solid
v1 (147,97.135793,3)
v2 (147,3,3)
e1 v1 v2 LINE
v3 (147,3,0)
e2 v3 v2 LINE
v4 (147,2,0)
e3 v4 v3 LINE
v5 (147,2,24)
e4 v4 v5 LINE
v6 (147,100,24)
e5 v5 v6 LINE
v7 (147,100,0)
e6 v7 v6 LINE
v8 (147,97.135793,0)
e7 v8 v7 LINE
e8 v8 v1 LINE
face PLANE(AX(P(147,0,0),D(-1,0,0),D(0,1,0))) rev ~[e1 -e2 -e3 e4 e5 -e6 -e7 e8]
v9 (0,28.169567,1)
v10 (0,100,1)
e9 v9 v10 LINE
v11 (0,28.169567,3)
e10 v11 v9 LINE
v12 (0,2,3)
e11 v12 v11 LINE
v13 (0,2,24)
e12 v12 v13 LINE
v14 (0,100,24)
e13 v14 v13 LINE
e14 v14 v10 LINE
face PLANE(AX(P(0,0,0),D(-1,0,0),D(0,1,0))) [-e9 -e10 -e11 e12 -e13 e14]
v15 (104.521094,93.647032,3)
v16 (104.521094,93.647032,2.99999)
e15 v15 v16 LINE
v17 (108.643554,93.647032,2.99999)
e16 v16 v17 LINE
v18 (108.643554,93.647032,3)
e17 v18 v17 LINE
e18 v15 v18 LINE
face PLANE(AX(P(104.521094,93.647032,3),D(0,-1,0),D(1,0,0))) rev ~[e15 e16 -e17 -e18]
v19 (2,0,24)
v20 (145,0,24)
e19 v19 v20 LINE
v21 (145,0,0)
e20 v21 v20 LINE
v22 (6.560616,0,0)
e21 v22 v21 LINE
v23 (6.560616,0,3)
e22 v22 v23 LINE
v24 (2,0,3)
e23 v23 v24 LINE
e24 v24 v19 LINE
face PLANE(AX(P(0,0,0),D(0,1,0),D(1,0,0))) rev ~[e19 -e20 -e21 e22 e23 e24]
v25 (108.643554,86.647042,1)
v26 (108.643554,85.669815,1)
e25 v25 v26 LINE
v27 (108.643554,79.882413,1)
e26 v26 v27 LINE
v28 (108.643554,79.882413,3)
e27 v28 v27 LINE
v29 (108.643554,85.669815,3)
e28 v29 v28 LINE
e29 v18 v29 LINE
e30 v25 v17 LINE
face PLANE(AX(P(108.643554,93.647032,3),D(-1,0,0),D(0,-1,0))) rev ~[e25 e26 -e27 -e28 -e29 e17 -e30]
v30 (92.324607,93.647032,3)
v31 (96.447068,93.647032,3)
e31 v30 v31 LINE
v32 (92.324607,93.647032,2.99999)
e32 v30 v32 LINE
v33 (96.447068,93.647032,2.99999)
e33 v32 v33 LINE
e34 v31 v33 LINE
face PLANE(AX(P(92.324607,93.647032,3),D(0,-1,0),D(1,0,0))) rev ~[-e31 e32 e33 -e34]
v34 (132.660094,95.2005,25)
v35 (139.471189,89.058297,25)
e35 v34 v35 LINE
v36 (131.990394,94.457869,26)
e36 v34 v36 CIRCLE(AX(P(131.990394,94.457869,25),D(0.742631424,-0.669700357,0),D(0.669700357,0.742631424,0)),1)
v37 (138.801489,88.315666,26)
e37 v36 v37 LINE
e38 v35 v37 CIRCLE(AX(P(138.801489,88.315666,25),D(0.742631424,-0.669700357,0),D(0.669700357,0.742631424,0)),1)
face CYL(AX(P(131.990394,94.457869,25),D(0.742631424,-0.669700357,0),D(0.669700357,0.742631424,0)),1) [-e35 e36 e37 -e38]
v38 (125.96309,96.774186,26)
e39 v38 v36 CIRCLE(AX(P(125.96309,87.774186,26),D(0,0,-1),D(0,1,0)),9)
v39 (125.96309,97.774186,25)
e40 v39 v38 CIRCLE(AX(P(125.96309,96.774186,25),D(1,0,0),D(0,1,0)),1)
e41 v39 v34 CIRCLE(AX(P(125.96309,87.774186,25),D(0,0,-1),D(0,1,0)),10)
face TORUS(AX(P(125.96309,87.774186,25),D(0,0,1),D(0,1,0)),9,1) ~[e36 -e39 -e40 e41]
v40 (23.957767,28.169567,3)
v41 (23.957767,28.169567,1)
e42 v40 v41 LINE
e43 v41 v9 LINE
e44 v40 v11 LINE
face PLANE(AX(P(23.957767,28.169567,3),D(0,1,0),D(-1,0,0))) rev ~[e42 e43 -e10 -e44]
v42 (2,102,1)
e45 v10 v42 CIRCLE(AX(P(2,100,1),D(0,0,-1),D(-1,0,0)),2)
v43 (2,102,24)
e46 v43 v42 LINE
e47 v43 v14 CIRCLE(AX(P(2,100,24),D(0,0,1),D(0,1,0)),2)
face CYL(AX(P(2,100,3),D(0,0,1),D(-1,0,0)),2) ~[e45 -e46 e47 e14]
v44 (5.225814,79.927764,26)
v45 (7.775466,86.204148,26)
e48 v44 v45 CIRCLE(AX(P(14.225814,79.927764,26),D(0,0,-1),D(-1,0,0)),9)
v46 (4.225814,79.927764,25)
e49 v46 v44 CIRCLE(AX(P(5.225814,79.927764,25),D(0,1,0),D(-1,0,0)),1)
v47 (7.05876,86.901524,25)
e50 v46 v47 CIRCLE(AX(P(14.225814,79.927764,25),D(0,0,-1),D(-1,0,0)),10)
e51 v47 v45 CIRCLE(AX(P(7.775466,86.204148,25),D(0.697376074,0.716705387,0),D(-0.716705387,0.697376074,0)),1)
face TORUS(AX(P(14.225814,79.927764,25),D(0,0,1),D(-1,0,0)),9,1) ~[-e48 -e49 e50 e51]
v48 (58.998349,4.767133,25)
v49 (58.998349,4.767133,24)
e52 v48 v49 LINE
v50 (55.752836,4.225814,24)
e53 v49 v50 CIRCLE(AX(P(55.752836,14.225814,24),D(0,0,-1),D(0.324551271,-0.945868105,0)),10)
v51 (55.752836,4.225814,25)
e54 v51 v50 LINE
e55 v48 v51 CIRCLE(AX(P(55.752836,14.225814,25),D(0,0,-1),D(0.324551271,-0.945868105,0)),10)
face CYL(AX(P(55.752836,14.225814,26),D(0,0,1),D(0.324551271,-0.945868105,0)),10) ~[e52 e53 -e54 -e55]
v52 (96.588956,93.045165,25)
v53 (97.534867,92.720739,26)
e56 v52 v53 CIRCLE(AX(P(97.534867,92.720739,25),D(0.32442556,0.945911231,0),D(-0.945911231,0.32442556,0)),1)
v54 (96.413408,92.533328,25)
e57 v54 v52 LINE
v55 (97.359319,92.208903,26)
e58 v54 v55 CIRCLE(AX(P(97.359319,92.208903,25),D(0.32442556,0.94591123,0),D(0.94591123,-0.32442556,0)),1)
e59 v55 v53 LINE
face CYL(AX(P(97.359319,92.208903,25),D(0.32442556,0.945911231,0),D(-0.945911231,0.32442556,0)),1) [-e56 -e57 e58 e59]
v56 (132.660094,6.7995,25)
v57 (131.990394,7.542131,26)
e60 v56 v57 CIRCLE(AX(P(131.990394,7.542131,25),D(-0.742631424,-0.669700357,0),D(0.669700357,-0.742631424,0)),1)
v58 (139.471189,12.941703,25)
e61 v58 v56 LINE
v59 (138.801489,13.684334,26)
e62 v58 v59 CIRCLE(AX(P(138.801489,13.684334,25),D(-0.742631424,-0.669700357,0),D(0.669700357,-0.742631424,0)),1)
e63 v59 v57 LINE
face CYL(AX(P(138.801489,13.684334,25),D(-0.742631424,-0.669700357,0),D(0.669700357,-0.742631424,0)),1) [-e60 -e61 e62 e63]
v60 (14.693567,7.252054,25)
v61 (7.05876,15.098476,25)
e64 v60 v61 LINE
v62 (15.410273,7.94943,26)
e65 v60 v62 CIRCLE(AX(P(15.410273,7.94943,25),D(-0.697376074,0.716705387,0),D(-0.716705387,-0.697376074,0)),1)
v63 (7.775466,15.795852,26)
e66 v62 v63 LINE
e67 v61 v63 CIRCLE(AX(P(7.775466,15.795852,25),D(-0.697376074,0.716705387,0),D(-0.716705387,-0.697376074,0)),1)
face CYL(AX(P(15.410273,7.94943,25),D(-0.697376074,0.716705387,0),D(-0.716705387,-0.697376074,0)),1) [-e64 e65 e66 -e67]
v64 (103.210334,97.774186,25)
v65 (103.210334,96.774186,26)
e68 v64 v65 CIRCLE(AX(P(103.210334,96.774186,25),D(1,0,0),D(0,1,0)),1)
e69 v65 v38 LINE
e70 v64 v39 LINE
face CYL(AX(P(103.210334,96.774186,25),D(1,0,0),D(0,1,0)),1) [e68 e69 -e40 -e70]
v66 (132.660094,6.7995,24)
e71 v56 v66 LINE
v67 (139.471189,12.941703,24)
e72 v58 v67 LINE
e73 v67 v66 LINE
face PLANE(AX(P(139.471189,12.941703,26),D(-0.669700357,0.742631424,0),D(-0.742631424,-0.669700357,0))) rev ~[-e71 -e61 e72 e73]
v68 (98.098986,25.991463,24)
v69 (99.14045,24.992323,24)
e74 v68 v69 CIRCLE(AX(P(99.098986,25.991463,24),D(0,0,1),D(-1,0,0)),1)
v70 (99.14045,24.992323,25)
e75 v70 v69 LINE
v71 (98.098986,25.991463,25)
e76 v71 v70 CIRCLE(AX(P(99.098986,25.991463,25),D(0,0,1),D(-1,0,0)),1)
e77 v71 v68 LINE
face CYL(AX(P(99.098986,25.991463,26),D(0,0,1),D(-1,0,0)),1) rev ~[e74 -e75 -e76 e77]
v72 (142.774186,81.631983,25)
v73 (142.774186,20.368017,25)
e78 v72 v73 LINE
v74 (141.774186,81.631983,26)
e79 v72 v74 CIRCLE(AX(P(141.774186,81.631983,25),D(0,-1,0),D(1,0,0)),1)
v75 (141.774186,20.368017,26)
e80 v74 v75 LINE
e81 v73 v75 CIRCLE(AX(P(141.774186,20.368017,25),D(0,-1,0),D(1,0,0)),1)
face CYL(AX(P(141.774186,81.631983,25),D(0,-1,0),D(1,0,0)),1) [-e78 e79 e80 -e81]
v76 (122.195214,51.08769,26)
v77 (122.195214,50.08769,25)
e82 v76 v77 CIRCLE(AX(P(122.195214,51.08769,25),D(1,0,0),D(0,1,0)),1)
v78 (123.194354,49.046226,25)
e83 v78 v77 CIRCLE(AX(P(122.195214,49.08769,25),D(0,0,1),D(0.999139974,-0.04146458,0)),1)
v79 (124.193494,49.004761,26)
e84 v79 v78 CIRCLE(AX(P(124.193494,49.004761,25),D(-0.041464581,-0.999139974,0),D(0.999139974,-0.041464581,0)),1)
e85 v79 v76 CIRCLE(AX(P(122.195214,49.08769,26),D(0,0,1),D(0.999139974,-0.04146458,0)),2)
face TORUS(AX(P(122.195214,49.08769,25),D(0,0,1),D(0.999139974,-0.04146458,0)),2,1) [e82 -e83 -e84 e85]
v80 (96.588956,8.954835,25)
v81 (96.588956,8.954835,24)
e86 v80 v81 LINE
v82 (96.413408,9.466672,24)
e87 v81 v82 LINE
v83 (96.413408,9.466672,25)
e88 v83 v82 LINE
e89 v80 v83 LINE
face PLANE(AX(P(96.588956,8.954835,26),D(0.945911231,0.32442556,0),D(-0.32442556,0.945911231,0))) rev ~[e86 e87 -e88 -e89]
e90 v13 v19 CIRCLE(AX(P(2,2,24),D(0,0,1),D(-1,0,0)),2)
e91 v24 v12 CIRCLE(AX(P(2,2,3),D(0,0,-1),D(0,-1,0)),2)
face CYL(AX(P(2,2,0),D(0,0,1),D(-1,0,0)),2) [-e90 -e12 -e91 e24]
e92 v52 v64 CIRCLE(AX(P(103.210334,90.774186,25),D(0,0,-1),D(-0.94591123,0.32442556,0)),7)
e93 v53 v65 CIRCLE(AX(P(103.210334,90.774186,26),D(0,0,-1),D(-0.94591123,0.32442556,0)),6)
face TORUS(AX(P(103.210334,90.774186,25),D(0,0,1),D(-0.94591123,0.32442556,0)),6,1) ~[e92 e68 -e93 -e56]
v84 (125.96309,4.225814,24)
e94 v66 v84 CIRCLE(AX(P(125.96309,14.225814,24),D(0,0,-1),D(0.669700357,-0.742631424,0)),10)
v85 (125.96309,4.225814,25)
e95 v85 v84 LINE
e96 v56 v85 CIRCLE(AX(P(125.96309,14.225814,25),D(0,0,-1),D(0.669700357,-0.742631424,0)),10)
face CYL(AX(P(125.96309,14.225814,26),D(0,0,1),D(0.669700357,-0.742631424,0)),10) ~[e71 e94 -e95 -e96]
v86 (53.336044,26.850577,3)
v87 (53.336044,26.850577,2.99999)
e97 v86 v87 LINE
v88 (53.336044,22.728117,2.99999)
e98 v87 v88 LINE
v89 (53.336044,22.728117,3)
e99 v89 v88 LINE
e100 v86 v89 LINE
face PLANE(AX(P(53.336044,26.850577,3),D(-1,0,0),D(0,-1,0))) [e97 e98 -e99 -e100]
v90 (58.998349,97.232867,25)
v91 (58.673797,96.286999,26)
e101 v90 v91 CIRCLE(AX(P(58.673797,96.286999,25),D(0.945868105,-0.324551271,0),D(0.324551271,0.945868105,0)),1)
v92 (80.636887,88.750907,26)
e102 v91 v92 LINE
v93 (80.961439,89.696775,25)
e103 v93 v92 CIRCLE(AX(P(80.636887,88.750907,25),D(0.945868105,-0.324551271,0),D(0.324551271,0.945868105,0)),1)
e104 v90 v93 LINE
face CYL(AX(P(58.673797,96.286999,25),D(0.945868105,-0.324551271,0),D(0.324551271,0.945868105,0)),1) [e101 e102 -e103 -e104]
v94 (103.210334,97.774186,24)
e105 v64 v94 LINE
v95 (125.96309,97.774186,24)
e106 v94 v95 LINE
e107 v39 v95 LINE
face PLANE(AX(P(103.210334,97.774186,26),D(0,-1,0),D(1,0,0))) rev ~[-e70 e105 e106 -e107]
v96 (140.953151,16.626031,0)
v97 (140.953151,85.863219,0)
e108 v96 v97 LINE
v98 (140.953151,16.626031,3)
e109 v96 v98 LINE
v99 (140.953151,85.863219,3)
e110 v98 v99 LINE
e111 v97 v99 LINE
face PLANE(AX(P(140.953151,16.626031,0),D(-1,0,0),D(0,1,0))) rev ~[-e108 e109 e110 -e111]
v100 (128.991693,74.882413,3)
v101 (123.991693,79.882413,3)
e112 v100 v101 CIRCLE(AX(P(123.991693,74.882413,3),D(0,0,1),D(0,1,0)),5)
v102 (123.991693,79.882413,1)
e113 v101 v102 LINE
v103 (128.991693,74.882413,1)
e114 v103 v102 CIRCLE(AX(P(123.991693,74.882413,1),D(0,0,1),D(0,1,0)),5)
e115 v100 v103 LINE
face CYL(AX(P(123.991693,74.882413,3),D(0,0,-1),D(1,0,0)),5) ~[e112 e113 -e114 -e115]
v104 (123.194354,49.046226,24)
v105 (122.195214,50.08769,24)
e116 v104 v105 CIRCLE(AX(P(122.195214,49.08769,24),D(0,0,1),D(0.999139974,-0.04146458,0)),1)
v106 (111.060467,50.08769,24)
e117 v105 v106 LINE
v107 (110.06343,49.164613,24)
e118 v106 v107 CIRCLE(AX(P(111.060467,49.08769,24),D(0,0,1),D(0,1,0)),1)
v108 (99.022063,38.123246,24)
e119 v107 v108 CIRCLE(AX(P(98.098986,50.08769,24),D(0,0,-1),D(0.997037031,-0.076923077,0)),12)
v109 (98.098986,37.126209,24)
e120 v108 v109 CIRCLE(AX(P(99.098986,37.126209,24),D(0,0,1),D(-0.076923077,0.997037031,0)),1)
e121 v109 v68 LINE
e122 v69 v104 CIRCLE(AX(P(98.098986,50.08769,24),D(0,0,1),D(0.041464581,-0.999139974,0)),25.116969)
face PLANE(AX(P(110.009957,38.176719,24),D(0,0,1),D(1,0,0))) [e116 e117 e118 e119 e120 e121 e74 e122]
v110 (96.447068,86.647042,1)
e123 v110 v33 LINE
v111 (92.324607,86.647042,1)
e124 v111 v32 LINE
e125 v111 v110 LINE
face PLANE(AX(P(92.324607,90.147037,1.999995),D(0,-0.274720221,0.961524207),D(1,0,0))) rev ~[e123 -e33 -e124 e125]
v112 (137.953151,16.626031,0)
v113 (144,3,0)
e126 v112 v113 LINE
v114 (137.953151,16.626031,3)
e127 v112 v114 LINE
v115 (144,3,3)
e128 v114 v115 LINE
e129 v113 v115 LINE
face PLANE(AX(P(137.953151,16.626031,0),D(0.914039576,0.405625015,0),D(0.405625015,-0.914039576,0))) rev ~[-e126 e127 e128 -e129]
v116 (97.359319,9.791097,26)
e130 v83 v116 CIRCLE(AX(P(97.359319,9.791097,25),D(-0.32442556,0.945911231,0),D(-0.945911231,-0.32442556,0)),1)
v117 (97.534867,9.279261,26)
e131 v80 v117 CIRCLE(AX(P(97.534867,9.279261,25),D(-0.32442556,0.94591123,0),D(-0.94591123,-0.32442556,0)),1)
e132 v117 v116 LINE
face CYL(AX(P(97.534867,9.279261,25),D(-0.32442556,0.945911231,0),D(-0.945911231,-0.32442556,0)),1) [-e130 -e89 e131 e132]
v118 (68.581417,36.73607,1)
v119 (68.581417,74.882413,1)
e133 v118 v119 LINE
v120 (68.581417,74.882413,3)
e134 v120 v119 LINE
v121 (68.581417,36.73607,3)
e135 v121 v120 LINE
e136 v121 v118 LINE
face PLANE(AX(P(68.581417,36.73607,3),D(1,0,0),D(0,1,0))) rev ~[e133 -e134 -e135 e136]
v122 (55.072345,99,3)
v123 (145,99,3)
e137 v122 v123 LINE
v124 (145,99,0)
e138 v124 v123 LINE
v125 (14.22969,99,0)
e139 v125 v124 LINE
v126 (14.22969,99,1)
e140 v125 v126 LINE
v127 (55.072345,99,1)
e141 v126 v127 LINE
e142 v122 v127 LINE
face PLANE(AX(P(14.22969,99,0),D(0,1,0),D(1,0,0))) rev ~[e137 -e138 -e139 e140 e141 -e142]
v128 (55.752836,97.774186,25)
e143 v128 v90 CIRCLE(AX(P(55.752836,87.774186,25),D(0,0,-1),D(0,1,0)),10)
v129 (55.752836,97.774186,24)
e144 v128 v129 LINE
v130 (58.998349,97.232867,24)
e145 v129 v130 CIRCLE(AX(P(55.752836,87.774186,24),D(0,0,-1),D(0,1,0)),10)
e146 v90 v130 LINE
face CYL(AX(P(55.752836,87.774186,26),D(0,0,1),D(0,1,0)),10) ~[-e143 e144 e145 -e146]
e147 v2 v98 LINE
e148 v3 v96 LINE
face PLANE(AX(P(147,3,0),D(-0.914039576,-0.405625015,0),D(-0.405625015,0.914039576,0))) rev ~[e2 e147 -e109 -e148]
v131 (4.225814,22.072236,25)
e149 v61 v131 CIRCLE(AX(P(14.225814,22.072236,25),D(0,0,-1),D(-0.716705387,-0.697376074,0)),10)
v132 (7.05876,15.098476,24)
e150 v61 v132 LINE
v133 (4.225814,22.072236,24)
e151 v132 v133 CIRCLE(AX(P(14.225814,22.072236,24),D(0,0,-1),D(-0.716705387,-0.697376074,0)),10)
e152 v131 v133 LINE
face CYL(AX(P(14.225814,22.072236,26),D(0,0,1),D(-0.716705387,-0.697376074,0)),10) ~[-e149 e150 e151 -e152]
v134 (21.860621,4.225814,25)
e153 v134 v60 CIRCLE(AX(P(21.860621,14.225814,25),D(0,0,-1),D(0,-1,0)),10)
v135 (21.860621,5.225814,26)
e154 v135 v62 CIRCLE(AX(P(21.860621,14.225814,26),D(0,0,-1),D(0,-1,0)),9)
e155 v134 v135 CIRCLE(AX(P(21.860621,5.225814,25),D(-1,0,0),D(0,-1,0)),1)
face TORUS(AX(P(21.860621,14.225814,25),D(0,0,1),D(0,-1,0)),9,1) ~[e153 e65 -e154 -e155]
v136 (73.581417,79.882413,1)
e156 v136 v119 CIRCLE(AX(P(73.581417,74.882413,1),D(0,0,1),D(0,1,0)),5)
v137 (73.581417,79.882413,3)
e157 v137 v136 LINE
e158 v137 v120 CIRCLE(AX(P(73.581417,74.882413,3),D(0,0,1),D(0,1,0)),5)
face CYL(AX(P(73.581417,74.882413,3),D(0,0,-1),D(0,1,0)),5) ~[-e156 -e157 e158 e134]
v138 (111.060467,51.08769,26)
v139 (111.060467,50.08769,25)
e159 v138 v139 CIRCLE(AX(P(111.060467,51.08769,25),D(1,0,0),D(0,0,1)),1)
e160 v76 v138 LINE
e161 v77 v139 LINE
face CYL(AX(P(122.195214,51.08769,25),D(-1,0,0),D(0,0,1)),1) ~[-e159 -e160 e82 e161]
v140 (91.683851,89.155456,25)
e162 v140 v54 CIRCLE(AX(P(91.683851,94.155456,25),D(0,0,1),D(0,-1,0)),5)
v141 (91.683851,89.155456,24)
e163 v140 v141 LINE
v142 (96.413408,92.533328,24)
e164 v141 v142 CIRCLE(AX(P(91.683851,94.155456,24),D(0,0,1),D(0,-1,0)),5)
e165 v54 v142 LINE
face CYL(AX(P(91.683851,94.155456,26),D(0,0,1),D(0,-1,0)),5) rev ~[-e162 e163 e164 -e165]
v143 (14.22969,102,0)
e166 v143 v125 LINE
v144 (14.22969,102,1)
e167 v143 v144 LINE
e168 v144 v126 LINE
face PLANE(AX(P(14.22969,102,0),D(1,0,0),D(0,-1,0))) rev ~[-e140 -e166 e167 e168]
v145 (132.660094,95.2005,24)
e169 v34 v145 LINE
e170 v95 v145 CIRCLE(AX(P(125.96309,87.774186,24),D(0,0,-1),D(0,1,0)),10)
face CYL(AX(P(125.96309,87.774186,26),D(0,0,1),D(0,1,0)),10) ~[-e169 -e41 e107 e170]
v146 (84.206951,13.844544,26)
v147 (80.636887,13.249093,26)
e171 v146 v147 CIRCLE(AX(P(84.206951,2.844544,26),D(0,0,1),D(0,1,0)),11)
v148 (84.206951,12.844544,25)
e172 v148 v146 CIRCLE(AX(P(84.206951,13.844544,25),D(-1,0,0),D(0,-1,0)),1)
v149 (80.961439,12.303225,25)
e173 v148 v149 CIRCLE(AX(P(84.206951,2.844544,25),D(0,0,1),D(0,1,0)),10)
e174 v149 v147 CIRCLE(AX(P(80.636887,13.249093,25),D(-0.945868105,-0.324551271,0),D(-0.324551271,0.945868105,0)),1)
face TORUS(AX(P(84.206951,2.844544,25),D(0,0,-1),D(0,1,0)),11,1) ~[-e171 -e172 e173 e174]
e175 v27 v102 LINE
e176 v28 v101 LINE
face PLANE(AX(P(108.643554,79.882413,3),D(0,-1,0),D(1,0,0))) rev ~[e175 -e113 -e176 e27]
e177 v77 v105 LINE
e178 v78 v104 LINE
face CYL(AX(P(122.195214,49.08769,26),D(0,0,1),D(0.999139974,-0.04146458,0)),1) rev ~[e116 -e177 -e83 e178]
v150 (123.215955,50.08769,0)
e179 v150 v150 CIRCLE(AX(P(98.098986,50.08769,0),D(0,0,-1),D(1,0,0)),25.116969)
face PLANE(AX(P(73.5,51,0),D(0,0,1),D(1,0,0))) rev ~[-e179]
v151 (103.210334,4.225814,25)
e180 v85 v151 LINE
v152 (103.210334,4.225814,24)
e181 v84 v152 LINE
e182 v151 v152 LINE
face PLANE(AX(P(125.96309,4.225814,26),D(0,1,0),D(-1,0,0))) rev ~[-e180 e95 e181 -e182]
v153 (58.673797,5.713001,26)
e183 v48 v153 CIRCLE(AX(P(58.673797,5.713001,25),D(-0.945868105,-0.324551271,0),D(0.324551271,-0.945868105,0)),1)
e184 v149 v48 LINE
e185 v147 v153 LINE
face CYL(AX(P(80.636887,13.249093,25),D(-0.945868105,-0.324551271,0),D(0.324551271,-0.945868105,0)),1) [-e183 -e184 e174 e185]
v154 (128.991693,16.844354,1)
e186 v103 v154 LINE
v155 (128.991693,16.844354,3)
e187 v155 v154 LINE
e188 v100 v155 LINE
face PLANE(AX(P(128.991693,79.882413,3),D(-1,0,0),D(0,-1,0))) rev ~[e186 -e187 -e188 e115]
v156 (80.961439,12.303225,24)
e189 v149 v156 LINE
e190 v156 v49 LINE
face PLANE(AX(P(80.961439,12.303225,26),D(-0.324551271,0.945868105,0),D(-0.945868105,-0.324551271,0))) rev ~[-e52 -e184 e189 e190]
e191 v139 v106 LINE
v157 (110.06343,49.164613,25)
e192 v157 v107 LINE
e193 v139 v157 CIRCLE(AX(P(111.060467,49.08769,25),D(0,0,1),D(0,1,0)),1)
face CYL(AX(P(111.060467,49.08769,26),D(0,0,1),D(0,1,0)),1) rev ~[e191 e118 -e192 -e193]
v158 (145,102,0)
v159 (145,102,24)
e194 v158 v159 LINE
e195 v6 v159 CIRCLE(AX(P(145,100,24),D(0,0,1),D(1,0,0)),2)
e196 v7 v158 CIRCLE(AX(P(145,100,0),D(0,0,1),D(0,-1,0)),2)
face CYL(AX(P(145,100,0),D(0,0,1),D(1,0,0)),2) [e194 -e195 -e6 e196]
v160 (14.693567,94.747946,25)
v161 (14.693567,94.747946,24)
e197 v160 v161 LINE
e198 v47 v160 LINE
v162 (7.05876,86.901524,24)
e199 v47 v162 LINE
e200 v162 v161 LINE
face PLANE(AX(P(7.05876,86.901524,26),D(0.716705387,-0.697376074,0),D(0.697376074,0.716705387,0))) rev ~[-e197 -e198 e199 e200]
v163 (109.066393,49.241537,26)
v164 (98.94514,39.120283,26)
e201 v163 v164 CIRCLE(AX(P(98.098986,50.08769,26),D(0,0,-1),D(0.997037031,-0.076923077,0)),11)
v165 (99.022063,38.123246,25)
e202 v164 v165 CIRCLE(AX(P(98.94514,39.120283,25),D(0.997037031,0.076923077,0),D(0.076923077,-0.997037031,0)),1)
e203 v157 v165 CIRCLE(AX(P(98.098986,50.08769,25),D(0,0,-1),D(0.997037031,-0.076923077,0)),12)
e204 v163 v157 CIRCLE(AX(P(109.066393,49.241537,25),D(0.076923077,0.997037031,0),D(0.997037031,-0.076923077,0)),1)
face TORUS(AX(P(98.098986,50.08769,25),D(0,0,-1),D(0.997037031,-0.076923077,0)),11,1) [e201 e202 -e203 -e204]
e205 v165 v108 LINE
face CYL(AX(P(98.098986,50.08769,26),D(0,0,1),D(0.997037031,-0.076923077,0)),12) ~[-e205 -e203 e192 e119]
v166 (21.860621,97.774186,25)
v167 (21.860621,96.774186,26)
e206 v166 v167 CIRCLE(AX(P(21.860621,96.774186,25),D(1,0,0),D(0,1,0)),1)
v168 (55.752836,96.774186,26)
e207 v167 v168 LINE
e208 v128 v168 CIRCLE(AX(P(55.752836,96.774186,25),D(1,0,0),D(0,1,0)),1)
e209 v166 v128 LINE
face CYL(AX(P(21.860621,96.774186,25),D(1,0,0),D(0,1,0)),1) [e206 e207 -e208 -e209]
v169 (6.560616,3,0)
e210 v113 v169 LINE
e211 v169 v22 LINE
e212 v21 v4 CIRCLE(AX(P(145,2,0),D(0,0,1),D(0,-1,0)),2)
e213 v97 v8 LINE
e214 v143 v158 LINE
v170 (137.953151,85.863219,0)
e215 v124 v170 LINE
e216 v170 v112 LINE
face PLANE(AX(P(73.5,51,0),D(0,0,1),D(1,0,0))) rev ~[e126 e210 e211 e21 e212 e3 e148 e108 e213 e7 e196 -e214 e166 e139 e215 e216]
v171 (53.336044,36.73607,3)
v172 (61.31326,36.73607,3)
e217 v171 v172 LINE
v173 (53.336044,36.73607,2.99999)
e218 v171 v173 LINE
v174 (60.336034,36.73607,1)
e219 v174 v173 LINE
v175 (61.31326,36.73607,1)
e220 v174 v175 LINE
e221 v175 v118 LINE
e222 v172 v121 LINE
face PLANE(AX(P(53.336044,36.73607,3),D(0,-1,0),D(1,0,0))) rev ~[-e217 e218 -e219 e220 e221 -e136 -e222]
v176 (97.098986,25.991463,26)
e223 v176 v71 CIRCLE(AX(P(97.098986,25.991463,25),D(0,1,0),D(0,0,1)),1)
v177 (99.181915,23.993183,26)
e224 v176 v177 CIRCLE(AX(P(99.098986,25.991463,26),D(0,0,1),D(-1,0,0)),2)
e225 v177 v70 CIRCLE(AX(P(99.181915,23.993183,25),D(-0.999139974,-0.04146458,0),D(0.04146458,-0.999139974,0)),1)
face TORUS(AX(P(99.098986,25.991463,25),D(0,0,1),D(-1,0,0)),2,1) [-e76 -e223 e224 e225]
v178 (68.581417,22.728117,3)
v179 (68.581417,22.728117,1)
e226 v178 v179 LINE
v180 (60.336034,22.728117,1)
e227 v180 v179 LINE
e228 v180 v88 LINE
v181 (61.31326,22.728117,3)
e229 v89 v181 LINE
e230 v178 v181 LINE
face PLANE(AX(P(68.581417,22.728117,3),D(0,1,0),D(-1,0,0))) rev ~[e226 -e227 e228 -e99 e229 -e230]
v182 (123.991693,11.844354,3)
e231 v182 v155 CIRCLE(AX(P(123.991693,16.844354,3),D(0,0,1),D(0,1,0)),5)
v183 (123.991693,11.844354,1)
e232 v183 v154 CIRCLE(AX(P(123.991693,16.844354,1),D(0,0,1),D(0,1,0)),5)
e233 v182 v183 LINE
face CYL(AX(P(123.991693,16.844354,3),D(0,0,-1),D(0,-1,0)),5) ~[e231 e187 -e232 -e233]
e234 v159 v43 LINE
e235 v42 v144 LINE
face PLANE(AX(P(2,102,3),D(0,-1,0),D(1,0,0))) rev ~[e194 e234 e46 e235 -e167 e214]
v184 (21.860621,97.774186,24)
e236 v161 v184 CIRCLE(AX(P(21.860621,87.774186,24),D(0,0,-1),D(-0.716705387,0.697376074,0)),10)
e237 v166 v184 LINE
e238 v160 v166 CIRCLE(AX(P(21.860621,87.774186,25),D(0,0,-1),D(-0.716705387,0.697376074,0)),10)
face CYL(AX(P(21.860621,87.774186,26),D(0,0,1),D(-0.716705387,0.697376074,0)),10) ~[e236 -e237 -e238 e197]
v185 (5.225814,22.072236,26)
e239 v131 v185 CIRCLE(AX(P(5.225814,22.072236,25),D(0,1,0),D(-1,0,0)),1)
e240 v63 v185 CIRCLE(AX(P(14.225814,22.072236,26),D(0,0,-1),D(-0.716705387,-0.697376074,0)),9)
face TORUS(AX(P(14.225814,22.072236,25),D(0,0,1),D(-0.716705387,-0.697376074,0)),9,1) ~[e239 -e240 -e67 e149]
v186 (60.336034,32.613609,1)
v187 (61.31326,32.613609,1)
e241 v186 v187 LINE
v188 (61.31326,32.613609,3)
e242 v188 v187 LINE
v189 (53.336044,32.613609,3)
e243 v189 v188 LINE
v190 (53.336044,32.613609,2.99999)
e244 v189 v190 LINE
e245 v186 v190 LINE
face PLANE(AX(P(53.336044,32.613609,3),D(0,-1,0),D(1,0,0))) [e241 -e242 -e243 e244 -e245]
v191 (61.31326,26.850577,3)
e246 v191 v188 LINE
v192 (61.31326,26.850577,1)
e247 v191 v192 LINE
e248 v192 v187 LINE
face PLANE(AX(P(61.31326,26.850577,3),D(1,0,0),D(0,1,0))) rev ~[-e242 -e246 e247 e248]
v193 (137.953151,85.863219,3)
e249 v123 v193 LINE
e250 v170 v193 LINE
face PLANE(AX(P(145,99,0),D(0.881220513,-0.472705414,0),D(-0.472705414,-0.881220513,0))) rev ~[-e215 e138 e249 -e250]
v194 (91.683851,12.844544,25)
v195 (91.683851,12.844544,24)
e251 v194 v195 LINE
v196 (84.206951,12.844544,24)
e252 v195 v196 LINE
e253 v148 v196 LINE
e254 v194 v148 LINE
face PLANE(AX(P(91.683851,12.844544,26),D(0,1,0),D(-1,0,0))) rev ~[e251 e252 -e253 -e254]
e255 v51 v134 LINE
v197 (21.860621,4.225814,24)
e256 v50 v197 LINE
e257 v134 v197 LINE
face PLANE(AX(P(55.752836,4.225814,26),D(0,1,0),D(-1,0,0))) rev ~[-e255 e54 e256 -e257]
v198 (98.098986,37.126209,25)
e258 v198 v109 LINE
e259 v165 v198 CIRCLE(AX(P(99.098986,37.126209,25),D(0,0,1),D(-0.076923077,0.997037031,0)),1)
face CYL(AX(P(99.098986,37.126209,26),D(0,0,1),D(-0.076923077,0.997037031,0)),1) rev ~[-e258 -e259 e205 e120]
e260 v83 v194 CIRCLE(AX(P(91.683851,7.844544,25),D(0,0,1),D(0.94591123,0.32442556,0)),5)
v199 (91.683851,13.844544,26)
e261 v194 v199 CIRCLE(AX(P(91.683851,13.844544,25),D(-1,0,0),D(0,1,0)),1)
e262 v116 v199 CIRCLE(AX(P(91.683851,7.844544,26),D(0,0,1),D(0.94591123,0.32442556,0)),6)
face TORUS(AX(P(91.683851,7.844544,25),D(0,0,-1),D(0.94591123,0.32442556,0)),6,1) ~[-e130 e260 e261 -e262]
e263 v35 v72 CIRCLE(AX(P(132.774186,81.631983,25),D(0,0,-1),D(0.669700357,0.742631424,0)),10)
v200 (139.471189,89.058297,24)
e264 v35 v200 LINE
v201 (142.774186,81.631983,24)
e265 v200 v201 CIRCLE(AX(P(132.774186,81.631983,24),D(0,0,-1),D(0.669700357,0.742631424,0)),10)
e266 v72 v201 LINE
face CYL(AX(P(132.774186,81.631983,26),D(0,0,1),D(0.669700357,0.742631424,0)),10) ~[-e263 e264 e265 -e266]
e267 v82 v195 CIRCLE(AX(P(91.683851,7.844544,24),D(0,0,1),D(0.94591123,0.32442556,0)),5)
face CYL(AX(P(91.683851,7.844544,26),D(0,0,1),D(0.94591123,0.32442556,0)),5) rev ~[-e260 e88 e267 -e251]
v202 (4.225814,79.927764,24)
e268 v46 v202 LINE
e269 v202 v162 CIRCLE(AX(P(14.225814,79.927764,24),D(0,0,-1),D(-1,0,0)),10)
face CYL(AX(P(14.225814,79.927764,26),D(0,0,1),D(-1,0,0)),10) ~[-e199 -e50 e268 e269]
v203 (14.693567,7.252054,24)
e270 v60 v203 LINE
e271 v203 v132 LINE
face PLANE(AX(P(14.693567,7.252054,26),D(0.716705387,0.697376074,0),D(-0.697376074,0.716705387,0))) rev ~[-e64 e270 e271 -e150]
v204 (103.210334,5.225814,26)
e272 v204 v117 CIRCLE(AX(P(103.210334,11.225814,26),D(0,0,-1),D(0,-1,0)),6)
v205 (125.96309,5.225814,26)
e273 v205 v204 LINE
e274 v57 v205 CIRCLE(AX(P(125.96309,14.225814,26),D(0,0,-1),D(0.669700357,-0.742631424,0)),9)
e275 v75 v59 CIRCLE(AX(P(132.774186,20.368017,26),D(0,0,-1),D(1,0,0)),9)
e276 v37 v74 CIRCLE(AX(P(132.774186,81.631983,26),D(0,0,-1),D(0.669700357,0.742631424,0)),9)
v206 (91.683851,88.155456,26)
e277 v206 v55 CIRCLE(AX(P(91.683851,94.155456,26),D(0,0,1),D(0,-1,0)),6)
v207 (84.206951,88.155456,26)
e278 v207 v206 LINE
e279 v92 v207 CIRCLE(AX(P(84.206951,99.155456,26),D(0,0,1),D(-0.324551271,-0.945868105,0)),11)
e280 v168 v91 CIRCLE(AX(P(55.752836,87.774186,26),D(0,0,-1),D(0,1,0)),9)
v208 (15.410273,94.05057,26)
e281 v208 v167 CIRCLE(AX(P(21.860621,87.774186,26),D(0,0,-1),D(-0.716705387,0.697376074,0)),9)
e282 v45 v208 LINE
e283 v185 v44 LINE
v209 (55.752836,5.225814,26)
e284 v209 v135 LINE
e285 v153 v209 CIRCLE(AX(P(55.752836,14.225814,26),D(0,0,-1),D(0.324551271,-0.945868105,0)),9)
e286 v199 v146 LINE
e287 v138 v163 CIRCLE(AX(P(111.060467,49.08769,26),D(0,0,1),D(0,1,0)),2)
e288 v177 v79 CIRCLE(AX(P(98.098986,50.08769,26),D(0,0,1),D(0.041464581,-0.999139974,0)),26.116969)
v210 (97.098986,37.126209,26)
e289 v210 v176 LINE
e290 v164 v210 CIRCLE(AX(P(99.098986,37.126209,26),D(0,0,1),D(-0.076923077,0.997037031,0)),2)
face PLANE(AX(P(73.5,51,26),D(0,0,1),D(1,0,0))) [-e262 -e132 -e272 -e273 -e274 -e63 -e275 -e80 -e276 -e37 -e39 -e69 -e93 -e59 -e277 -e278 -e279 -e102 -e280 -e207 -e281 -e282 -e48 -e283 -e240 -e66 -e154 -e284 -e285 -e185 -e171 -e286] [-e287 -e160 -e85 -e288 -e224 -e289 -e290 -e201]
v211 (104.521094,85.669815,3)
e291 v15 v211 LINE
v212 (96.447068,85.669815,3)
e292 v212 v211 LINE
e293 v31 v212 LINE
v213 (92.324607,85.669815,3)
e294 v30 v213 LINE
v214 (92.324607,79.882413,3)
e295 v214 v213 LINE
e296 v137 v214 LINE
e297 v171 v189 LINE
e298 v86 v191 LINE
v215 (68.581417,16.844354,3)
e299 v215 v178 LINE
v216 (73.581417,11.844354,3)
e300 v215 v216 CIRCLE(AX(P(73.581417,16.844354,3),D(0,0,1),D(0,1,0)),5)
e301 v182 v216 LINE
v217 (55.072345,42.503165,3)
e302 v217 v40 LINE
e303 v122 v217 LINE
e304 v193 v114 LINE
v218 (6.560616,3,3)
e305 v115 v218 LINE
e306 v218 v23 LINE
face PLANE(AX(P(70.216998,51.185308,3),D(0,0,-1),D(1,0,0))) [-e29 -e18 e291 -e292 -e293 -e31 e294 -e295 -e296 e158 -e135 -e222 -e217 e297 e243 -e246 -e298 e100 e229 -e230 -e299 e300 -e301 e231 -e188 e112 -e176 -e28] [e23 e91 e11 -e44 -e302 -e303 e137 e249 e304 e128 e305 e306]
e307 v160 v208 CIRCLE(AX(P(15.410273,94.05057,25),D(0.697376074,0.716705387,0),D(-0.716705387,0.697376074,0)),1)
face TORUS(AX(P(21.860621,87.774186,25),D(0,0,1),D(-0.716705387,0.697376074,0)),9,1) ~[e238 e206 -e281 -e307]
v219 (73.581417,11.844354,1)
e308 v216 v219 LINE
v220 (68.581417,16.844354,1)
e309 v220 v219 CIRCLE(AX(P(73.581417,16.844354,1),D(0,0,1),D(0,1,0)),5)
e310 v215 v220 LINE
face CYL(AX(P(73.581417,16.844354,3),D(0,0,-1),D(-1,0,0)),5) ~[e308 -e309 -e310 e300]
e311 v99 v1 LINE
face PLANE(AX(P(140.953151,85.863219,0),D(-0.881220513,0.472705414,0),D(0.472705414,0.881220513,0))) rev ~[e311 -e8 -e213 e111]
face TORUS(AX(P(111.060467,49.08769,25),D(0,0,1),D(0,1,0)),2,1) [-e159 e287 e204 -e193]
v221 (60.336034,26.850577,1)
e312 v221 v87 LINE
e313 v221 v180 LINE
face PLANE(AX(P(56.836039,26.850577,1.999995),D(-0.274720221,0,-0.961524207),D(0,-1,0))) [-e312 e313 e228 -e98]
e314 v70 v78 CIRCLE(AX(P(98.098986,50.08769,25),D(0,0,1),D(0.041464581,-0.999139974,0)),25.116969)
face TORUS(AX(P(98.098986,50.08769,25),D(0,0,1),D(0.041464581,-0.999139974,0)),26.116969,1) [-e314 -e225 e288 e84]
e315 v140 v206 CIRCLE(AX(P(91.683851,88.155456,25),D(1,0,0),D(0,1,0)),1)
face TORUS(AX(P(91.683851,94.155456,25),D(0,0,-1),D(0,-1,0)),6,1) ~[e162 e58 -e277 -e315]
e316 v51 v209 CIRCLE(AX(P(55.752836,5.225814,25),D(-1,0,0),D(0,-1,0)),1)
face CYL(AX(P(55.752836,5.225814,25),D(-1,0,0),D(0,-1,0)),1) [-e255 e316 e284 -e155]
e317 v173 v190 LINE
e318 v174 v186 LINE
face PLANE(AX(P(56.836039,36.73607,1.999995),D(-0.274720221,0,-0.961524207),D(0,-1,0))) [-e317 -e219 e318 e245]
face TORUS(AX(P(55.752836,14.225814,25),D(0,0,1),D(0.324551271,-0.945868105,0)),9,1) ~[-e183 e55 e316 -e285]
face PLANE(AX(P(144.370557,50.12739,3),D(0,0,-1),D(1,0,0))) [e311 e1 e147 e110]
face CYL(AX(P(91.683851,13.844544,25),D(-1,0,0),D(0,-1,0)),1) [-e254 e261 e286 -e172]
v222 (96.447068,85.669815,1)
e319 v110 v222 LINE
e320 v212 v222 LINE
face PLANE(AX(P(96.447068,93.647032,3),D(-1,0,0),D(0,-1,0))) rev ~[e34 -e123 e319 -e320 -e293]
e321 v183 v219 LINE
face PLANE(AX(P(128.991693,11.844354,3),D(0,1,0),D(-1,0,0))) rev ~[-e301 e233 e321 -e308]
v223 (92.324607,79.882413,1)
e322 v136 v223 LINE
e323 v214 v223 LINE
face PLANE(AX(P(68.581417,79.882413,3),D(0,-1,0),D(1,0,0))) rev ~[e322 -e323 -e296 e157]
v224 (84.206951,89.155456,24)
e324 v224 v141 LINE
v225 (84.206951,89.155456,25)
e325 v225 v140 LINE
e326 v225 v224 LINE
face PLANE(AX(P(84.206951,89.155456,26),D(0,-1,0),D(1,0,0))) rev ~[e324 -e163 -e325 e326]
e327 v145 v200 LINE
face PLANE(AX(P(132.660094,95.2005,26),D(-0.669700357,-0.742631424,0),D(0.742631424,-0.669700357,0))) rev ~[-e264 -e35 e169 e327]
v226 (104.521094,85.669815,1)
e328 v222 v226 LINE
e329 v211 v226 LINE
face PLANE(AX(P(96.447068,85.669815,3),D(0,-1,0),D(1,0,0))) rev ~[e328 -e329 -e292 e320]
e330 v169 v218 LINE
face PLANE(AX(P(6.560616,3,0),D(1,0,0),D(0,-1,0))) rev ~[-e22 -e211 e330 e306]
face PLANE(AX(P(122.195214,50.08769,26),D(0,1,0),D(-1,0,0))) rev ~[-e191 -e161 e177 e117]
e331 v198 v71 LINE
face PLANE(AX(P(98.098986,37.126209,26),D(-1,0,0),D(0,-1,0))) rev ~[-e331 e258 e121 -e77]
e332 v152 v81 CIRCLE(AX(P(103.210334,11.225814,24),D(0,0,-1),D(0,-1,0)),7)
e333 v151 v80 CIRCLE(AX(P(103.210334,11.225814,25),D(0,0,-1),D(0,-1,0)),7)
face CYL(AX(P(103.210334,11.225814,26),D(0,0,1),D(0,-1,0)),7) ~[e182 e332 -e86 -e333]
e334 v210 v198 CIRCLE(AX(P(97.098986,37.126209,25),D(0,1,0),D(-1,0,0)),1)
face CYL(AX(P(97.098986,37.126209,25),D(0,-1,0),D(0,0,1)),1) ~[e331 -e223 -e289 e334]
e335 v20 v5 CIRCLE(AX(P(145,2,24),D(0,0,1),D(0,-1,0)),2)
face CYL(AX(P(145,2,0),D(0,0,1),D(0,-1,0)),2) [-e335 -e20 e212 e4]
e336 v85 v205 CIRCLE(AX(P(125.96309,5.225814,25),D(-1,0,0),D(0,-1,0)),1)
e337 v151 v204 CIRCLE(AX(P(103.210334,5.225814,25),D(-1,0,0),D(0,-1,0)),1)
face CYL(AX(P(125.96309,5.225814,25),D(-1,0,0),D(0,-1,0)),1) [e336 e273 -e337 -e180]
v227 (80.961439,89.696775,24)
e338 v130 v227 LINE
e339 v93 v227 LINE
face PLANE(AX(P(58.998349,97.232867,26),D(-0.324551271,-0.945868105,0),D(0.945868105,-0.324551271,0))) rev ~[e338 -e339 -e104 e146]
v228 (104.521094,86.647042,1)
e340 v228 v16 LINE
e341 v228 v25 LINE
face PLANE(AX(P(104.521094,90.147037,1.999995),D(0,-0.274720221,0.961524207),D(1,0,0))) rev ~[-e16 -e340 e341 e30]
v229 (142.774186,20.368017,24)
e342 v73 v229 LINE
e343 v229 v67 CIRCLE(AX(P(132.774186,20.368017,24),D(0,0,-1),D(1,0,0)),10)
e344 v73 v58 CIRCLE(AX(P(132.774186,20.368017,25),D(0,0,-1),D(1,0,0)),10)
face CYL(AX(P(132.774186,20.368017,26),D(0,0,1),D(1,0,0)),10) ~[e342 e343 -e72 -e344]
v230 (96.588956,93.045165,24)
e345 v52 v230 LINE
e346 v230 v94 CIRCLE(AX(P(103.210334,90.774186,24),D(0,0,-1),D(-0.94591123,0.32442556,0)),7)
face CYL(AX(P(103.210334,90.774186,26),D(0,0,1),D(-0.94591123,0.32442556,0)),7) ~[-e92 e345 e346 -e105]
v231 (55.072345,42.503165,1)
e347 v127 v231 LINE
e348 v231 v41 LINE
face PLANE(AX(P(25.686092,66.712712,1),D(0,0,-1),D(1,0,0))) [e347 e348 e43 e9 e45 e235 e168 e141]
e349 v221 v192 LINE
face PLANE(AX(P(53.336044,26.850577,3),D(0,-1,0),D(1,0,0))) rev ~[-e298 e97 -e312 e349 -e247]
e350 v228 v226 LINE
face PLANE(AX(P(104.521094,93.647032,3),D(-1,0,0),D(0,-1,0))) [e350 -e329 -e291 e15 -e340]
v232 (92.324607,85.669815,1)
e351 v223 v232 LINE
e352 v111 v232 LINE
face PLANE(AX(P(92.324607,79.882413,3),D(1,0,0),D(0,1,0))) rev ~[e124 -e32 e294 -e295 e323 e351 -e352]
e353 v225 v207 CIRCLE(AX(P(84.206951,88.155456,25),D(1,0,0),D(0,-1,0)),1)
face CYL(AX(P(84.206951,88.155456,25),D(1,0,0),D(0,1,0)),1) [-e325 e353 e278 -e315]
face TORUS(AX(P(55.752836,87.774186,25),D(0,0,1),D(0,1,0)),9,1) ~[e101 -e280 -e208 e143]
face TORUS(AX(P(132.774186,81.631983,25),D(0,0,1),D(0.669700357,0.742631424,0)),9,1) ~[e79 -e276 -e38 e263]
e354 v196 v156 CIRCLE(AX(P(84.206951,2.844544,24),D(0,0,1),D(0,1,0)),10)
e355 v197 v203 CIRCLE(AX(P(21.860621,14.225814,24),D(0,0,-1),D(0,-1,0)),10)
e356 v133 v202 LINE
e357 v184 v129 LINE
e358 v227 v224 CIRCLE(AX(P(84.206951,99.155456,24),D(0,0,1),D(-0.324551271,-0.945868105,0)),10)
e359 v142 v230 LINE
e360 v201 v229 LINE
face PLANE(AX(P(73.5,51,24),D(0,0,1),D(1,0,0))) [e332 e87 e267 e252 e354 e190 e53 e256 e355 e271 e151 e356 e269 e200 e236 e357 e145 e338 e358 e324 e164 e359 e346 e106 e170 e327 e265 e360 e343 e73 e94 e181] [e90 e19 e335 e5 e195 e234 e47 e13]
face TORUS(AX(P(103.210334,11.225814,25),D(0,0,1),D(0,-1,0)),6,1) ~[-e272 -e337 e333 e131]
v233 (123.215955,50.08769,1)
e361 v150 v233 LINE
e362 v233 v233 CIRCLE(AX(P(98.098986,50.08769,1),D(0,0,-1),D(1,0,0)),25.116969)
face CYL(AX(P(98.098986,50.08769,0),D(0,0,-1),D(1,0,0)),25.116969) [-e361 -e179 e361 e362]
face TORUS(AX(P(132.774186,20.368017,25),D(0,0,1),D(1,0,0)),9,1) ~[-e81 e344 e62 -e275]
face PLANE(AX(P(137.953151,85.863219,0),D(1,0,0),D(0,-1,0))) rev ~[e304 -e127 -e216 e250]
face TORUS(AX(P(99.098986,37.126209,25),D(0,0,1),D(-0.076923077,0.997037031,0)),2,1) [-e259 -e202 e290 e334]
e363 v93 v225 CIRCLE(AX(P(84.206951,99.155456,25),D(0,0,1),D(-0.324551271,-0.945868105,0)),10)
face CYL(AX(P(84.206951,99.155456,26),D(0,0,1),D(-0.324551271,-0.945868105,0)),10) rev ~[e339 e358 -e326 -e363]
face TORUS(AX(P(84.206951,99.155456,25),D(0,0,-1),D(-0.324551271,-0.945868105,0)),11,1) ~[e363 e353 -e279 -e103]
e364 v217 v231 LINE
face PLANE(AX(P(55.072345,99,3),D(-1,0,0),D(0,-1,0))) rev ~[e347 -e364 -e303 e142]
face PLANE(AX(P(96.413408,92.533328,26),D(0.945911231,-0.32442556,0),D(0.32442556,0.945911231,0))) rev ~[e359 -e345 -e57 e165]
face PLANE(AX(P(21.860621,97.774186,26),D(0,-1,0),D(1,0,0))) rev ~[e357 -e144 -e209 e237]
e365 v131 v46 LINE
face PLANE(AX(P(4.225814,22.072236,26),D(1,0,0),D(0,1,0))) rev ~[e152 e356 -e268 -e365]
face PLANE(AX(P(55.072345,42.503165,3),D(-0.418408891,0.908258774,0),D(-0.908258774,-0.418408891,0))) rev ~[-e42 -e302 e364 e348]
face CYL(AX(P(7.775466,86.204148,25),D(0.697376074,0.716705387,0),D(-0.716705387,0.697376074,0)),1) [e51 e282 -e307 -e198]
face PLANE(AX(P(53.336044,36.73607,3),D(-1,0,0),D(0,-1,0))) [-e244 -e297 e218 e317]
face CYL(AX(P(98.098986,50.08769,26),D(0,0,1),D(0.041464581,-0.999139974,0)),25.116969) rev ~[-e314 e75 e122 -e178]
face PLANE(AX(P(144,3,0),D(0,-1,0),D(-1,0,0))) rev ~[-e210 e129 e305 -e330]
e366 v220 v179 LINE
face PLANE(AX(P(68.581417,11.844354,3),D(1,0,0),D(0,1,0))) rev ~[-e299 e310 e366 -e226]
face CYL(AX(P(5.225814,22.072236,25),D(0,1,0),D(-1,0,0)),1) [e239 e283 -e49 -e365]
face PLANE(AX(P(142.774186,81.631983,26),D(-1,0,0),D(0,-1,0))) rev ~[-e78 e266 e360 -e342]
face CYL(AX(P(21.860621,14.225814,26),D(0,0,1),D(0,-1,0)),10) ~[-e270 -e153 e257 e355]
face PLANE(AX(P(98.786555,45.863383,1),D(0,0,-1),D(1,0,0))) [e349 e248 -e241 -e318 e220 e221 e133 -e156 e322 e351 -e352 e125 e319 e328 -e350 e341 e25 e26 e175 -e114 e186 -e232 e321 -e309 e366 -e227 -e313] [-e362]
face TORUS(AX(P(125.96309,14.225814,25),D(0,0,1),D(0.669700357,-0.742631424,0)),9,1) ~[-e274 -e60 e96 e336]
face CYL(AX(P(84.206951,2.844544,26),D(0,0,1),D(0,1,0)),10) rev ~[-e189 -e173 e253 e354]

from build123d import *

# Parameters (mm, degrees)
F0_W      = 147
F0_H      = 102
F1_DEPTH  = 26
F2_R      = 2
F3_R      = 25.1169689263
F4_DEPTH  = 3
F6_DEPTH  = 2
F7_R      = 25.1169689263
F7_W      = 7.9772167655
F7_H      = 4.1224605193
F7_W_2    = 4.1224605193
F7_H_2    = 7.9772167655
F8_DEPTH  = 2
F9_SIZE2  = 1.99999
F9_SIZE   = 6.99999
F10_R     = 5
F12_DEPTH = 2
F13_R     = 1


# Not quite as in the source:
# - a fillet or chamfer is up to 0.001 mm smaller than in the source, because OpenCascade refuses the exact size


with BuildPart() as f1:
    # F0 (on Top) → F1 (new body)
    with BuildSketch(Plane.XY):
        with Locations((73.5, 51)):
            Rectangle(F0_W, F0_H)
    extrude(amount=F1_DEPTH)

    # F2
    f2_edges = [f1.edges().sort_by_distance(p)[0] for p in [
        (0, 0, 13),
        (147, 0, 13),
        (147, 102, 13),
        (0, 102, 13),
    ]]
    fillet(f2_edges, radius=F2_R)

    # F3 (on face) → F4 (cut)
    with BuildSketch(Plane(origin=(0, 0, 0), x_dir=(1, 0, 0), z_dir=(0, 0, -1))):
        with BuildLine():
            Line((144, -3), (6.5606157295, -3))
            Line((6.5606157295, -3), (6.5606157295, 0))
            Line((6.5606157295, 0), (2, 0))
            ThreePointArc((2, 0), (0.5857864376, -0.5857864376), (0, -2))
            Line((0, -2), (0, -100))
            ThreePointArc((0, -100), (0.5857864376, -101.4142135624), (2, -102))
            Line((2, -102), (14.2296897247, -102))
            Line((14.2296897247, -102), (14.2296897247, -99))
            Line((14.2296897247, -99), (145, -99))
            Line((145, -99), (137.9531513453, -85.8632188108))
            Line((137.9531513453, -85.8632188108), (137.9531513453, -16.6260308719))
            Line((137.9531513453, -16.6260308719), (144, -3))
        make_face()
        with Locations((98.0989858508, -50.0876903534)):
            Circle(F3_R, mode=Mode.SUBTRACT)
        Polygon((147, -97.1357934826), (147, -3), (140.9531513453, -16.6260308719), (140.9531513453, -85.8632188108), align=None)
    extrude(amount=-F4_DEPTH, mode=Mode.SUBTRACT)

    # F5 (on face) → F6 (join)
    with BuildSketch(Plane(origin=(0, 0, 3), x_dir=(1, 0, 0), z_dir=(0, 0, -1))):
        with BuildLine():
            Line((14.2296897247, -99), (55.0723448396, -99))
            Line((55.0723448396, -99), (55.0723448396, -42.5031647924))
            Line((55.0723448396, -42.5031647924), (23.9577665925, -28.1695667654))
            Line((23.9577665925, -28.1695667654), (0, -28.1695667654))
            Line((0, -28.1695667654), (0, -100))
            ThreePointArc((0, -100), (0.5857864376, -101.4142135624), (2, -102))
            Line((2, -102), (14.2296897247, -102))
            Line((14.2296897247, -102), (14.2296897247, -99))
        make_face()
    extrude(amount=F6_DEPTH)

    # F7 (on face) → F8 (join)
    with BuildSketch(Plane(origin=(0, 0, 3), x_dir=(1, 0, 0), z_dir=(0, 0, -1))):
        Polygon((68.5814172029, -11.8443537503), (68.5814172029, -22.7281169246), (68.5814172029, -36.7360695054), (68.5814172029, -79.8824131489), (92.3246070743, -79.8824131489), (108.6435541511, -79.8824131489), (128.9916932583, -79.8824131489), (128.9916932583, -11.8443537503), align=None)
        with Locations((98.0989858508, -50.0876903534)):
            Circle(F7_R, mode=Mode.SUBTRACT)
        Polygon((68.5814172029, -36.7360695054), (68.5814172029, -22.7281169246), (61.3132603467, -22.7281169246), (61.3132603467, -26.8505774438), (61.3132603467, -32.6136089861), (61.3132603467, -36.7360695054), align=None)
        Polygon((108.6435541511, -79.8824131489), (92.3246070743, -79.8824131489), (92.3246070743, -85.6698147568), (96.4470675935, -85.6698147568), (104.5210936318, -85.6698147568), (108.6435541511, -85.6698147568), align=None)
        with Locations((57.3246519639, -24.7893471842)):
            Rectangle(F7_W, F7_H)
        with Locations((57.3246519639, -34.6748392458)):
            Rectangle(F7_W, F7_H)
        with Locations((94.3858373339, -89.6584231396)):
            Rectangle(F7_W_2, F7_H_2)
        with Locations((106.5823238914, -89.6584231396)):
            Rectangle(F7_W_2, F7_H_2)
    extrude(amount=F8_DEPTH)

    # F9 (size 7 and 2 in the source; OpenCascade refuses exactly that, so slightly less here)
    f9_edges = [f1.edges().sort_by_distance(p)[0] for p in [
        (53.336044, 24.789347, 1),
        (53.336044, 34.674839, 1),
        (94.385837, 93.647032, 1),
        (106.582324, 93.647032, 1),
    ]]
    f9_side = f1.faces().sort_by_distance((69.695664, 17.286235, 1))[0]
    chamfer(f9_edges, length=F9_SIZE, length2=F9_SIZE2, reference=f9_side)

    # F10
    f10_edges = [f1.edges().sort_by_distance(p)[0] for p in [
        (68.581417, 11.844354, 2),
        (128.991693, 11.844354, 2),
        (128.991693, 79.882413, 2),
        (68.581417, 79.882413, 2),
    ]]
    fillet(f10_edges, radius=F10_R)

    # F11 (on face) → F12 (cut)
    with BuildSketch(Plane.XY.offset(26)):
        with BuildLine():
            ThreePointArc((2, 102), (0.5857864376, 101.4142135624), (0, 100))
            Line((0, 100), (0, 2))
            ThreePointArc((0, 2), (0.5857864376, 0.5857864376), (2, 0))
            Line((2, 0), (145, 0))
            ThreePointArc((145, 0), (146.4142135624, 0.5857864376), (147, 2))
            Line((147, 2), (147, 100))
            ThreePointArc((147, 100), (146.4142135624, 101.4142135624), (145, 102))
            Line((145, 102), (2, 102))
        make_face()
        with BuildLine():
            Line((4.2258142494, 22.0722364937), (4.2258142494, 51))
            Line((4.2258142494, 51), (4.2258142494, 79.9277635063))
            ThreePointArc((4.2258142494, 79.9277635063), (4.9610816932, 83.691369578), (7.058760382, 86.9015242465))
            Line((7.058760382, 86.9015242465), (14.6935671534, 94.7479464908))
            ThreePointArc((14.6935671534, 94.7479464908), (17.9707371795, 96.986612342), (21.8606210208, 97.7741857506))
            Line((21.8606210208, 97.7741857506), (55.7528358207, 97.7741857506))
            ThreePointArc((55.7528358207, 97.7741857506), (57.3980089851, 97.6379277008), (58.9983485321, 97.2328668025))
            Line((58.9983485321, 97.2328668025), (80.9614386994, 89.6967750441))
            ThreePointArc((80.9614386994, 89.6967750441), (82.5617782464, 89.2917141458), (84.2069514108, 89.1554560959))
            Line((84.2069514108, 89.1554560959), (91.6838514243, 89.1554560959))
            ThreePointArc((91.6838514243, 89.1554560959), (94.5898246688, 90.0866332315), (96.4134075766, 92.533328295))
            Line((96.4134075766, 92.533328295), (96.5889555539, 93.0451646719))
            ThreePointArc((96.5889555539, 93.0451646719), (99.1419716248, 96.4705377609), (103.2103341671, 97.7741857506))
            Line((103.2103341671, 97.7741857506), (125.9630903806, 97.7741857506))
            ThreePointArc((125.9630903806, 97.7741857506), (129.5503496104, 97.1086150968), (132.660093946, 95.2004999942))
            Line((132.660093946, 95.2004999942), (139.4711893161, 89.0582969469))
            ThreePointArc((139.4711893161, 89.0582969469), (141.9111993671, 85.6958456652), (142.7741857506, 81.6319827033))
            Line((142.7741857506, 81.6319827033), (142.7741857506, 51))
            Line((142.7741857506, 51), (142.7741857506, 20.3680172967))
            ThreePointArc((142.7741857506, 20.3680172967), (141.9111993671, 16.3041543348), (139.4711893161, 12.9417030531))
            Line((139.4711893161, 12.9417030531), (132.660093946, 6.7995000058))
            ThreePointArc((132.660093946, 6.7995000058), (129.5503496104, 4.8913849032), (125.9630903806, 4.2258142494))
            Line((125.9630903806, 4.2258142494), (103.2103341671, 4.2258142494))
            ThreePointArc((103.2103341671, 4.2258142494), (99.1419716248, 5.5294622391), (96.5889555539, 8.9548353281))
            Line((96.5889555539, 8.9548353281), (96.4134075766, 9.466671705))
            ThreePointArc((96.4134075766, 9.466671705), (94.5898246688, 11.9133667685), (91.6838514243, 12.8445439041))
            Line((91.6838514243, 12.8445439041), (84.2069514108, 12.8445439041))
            ThreePointArc((84.2069514108, 12.8445439041), (82.5617782464, 12.7082858542), (80.9614386994, 12.3032249559))
            Line((80.9614386994, 12.3032249559), (58.9983485321, 4.7671331975))
            ThreePointArc((58.9983485321, 4.7671331975), (57.3980089851, 4.3620722992), (55.7528358207, 4.2258142494))
            Line((55.7528358207, 4.2258142494), (21.8606210208, 4.2258142494))
            ThreePointArc((21.8606210208, 4.2258142494), (17.9707371795, 5.013387658), (14.6935671534, 7.2520535092))
            Line((14.6935671534, 7.2520535092), (7.058760382, 15.0984757535))
            ThreePointArc((7.058760382, 15.0984757535), (4.9610816932, 18.308630422), (4.2258142494, 22.0722364937))
        make_face(mode=Mode.SUBTRACT)
        with BuildLine():
            ThreePointArc((99.0220627739, 38.1232459871), (98.3651864651, 37.8055751771), (98.0989858508, 37.1262089566))
            Line((98.0989858508, 37.1262089566), (98.0989858508, 25.9914626364))
            ThreePointArc((98.0989858508, 25.9914626364), (98.4066942145, 25.269844808), (99.1404504313, 24.9923226619))
            ThreePointArc((99.1404504313, 24.9923226619), (115.8593649014, 32.3273113028), (123.1943535423, 49.0462257729))
            ThreePointArc((123.1943535423, 49.0462257729), (122.9168313962, 49.7799819897), (122.1952135678, 50.0876903534))
            Line((122.1952135678, 50.0876903534), (111.0604672476, 50.0876903534))
            ThreePointArc((111.0604672476, 50.0876903534), (110.3811010271, 49.8214897391), (110.0634302171, 49.1646134303))
            ThreePointArc((110.0634302171, 49.1646134303), (106.584267225, 41.6024089792), (99.0220627739, 38.1232459871))
        make_face()
    extrude(amount=-F12_DEPTH, mode=Mode.SUBTRACT)

    # F13
    f13_edges = [f1.edges().sort_by_distance(p)[0] for p in [
        (141.911199, 85.695846, 26),
        (142.774186, 51, 26),
        (141.911199, 16.304154, 26),
        (136.065642, 9.870602, 26),
        (129.55035, 4.891385, 26),
        (114.586712, 4.225814, 26),
        (99.141972, 5.529462, 26),
        (96.501182, 9.210754, 26),
        (94.589825, 11.913367, 26),
        (87.945401, 12.844544, 26),
        (82.561778, 12.708286, 26),
        (69.979894, 8.535179, 26),
        (57.398009, 4.362072, 26),
        (38.806728, 4.225814, 26),
        (17.970737, 5.013388, 26),
        (10.876164, 11.175265, 26),
        (4.961082, 18.30863, 26),
        (4.225814, 51, 26),
        (4.961082, 83.69137, 26),
        (10.876164, 90.824735, 26),
        (17.970737, 96.986612, 26),
        (38.806728, 97.774186, 26),
        (57.398009, 97.637928, 26),
        (69.979894, 93.464821, 26),
        (82.561778, 89.291714, 26),
        (87.945401, 89.155456, 26),
        (94.589825, 90.086633, 26),
        (96.501182, 92.789246, 26),
        (99.141972, 96.470538, 26),
        (114.586712, 97.774186, 26),
        (129.55035, 97.108615, 26),
        (136.065642, 92.129398, 26),
        (106.584267, 41.602409, 26),
        (98.365186, 37.805575, 26),
        (98.098986, 31.558836, 26),
        (98.406694, 25.269845, 26),
        (115.859365, 32.327311, 26),
        (122.916831, 49.779982, 26),
        (116.62784, 50.08769, 26),
        (110.381101, 49.82149, 26),
    ]]
    fillet(f13_edges, radius=F13_R)


solid = f1.part
